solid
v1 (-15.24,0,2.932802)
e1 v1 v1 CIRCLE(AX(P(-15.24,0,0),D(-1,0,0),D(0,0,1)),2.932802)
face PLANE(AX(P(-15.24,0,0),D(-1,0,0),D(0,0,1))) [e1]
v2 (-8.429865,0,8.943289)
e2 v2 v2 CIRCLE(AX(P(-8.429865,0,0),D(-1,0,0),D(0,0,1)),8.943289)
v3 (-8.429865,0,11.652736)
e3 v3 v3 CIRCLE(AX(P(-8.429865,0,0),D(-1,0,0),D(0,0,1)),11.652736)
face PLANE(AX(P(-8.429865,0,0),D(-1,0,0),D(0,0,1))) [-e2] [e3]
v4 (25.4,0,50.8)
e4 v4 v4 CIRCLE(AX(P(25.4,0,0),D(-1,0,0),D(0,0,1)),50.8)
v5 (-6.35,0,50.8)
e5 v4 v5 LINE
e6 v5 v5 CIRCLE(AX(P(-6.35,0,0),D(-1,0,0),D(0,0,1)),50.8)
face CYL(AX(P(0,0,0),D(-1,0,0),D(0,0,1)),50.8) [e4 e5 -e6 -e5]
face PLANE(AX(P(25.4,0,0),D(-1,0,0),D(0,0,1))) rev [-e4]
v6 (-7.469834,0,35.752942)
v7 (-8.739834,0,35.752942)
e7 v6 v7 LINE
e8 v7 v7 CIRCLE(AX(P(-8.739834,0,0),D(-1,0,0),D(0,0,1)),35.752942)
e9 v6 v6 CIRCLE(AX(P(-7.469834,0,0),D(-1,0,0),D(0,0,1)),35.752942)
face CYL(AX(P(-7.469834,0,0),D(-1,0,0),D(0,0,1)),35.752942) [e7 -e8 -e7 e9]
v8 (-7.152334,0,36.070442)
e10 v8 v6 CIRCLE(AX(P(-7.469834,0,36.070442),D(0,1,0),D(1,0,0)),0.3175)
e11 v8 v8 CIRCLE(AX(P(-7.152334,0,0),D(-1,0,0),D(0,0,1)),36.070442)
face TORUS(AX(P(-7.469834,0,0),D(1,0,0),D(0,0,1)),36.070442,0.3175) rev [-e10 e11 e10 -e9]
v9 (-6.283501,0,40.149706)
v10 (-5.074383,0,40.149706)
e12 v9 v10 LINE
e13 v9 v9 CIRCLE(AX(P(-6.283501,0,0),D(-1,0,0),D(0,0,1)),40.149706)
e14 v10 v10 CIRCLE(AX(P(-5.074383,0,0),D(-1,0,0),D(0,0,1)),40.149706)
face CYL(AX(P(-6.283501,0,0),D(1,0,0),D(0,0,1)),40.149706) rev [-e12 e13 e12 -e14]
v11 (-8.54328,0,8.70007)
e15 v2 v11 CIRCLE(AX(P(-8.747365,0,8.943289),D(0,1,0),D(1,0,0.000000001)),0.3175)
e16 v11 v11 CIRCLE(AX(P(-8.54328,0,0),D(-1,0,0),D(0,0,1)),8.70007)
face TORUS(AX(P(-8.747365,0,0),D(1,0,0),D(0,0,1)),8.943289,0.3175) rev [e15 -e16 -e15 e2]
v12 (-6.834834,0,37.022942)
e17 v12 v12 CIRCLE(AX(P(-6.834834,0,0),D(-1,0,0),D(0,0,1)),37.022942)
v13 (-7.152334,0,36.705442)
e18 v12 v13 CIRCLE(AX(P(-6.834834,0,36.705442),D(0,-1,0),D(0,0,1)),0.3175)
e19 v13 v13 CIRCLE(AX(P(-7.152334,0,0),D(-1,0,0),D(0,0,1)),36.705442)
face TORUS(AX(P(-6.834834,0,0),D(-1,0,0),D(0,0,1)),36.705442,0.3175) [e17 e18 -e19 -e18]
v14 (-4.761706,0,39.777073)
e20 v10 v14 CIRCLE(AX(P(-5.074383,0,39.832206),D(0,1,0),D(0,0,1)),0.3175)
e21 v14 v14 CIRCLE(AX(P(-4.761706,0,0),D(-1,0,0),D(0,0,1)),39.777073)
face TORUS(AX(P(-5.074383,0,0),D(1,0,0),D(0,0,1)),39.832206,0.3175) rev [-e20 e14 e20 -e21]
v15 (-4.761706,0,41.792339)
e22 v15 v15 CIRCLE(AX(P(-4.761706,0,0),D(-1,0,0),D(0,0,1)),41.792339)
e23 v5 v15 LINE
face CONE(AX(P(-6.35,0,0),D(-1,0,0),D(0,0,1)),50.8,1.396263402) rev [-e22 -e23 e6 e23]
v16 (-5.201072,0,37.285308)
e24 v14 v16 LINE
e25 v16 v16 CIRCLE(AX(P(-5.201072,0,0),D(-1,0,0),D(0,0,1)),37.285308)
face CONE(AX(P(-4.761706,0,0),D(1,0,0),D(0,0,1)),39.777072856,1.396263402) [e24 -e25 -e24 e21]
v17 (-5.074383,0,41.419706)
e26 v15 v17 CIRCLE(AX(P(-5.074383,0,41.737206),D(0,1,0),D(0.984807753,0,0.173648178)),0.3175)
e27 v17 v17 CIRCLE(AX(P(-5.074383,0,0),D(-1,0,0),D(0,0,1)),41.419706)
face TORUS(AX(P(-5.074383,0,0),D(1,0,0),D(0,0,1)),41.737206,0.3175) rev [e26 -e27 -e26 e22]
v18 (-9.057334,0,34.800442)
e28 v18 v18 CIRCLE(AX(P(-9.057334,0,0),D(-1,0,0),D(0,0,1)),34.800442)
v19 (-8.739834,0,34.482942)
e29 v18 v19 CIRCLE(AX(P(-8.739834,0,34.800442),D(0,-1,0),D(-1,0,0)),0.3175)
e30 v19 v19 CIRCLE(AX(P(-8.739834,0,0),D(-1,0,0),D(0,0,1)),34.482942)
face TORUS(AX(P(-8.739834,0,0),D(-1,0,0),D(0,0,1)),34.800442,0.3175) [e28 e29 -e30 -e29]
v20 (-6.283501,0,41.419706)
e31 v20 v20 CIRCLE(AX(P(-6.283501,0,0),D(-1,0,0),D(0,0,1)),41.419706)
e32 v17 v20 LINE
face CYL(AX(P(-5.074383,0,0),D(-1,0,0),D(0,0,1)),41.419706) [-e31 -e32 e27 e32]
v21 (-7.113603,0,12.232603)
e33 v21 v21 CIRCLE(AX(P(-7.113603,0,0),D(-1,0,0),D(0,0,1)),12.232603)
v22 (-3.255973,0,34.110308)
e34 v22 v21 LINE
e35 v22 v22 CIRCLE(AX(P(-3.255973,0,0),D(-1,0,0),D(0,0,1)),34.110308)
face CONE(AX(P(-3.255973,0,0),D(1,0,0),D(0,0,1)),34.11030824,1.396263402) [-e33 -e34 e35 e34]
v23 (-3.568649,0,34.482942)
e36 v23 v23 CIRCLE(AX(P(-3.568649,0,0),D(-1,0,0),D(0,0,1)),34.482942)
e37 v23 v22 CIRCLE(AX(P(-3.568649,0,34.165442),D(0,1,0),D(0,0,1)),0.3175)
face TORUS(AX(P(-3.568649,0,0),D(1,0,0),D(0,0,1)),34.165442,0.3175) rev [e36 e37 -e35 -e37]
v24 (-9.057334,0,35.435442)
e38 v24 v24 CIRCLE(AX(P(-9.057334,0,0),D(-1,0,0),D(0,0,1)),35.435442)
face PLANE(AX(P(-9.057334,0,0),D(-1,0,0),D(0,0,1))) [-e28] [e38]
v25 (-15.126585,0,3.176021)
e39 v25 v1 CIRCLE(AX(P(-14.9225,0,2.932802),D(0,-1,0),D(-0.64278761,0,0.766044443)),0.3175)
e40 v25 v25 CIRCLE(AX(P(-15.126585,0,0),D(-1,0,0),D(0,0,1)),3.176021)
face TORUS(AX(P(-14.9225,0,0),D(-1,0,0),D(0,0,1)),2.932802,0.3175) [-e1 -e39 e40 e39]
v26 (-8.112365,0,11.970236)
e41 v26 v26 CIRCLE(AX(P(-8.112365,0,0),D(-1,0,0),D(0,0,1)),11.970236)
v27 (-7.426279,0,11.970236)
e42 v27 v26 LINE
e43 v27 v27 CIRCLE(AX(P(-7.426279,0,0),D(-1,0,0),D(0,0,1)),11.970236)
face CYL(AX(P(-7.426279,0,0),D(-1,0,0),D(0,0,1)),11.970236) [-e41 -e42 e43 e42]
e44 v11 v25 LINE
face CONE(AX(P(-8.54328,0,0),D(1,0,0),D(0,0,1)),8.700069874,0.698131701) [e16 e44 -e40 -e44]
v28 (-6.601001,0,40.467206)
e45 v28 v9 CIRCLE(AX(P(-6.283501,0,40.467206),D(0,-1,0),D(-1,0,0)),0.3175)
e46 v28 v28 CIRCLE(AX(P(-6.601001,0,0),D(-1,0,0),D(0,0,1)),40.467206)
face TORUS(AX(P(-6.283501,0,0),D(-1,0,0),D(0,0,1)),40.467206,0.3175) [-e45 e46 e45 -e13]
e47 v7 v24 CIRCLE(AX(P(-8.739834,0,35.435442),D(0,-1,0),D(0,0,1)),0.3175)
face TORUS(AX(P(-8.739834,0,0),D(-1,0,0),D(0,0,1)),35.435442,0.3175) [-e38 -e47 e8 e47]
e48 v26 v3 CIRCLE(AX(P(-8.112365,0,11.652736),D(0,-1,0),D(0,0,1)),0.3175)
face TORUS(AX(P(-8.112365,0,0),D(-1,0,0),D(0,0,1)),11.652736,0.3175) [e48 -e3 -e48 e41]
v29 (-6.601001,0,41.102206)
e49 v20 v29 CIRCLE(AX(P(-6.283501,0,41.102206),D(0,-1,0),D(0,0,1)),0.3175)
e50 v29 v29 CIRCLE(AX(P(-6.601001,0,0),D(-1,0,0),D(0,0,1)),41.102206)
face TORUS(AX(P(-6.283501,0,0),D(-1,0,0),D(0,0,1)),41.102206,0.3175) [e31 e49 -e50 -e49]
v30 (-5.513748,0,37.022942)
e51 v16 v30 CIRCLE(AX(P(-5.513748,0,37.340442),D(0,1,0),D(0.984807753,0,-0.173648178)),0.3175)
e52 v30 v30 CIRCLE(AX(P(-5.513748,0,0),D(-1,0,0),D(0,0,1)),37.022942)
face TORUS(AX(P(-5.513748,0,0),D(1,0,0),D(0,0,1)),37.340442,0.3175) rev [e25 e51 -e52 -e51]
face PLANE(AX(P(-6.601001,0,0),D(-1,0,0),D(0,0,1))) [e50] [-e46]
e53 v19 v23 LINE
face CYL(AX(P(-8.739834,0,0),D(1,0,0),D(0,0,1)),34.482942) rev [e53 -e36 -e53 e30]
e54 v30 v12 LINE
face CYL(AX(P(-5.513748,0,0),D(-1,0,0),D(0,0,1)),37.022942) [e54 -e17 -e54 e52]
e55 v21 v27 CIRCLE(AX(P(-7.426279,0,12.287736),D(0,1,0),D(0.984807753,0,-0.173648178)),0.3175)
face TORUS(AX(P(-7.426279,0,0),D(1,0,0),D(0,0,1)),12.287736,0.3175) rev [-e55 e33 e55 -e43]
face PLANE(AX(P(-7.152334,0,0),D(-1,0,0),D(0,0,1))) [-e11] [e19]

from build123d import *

# Parameters (mm, degrees)
F2_DEPTH = 25.4


# Not quite as in the source:
# - a feature of the source that left no trace in its solid (it failed there, or was rolled back) is left out


with BuildPart() as f1:
    # F0 (on Front) → F1 (revolve)
    with BuildSketch(Plane.XZ):
        with BuildLine():
            Line((-15.24, 0), (0, 0))
            Line((0, 0), (0, 50.8))
            Line((0, 50.8), (-6.35, 50.8))
            Line((-6.35, 50.8), (-4.7617064118, 41.792339449))
            ThreePointArc((-4.7617064118, 41.792339449), (-4.8311637627, 41.5331210865), (-5.0743828734, 41.4197061526))
            Line((-5.0743828734, 41.4197061526), (-6.2835011077, 41.4197061526))
            ThreePointArc((-6.2835011077, 41.4197061526), (-6.5080075107, 41.3267125556), (-6.6010011077, 41.1022061526))
            Line((-6.6010011077, 41.1022061526), (-6.6010011077, 40.4672061526))
            ThreePointArc((-6.6010011077, 40.4672061526), (-6.5080075107, 40.2426997495), (-6.2835011077, 40.1497061526))
            Line((-6.2835011077, 40.1497061526), (-5.0743828734, 40.1497061526))
            ThreePointArc((-5.0743828734, 40.1497061526), (-4.8311637627, 40.0362912186), (-4.7617064118, 39.7770728561))
            Line((-4.7617064118, 39.7770728561), (-5.2010717431, 37.2853082403))
            ThreePointArc((-5.2010717431, 37.2853082403), (-5.3096631386, 37.0972224261), (-5.5137482047, 37.0229415367))
            Line((-5.5137482047, 37.0229415367), (-6.8348340718, 37.0229415367))
            ThreePointArc((-6.8348340718, 37.0229415367), (-7.0593404748, 36.9299479398), (-7.1523340718, 36.7054415367))
            Line((-7.1523340718, 36.7054415367), (-7.1523340718, 36.0704415367))
            ThreePointArc((-7.1523340718, 36.0704415367), (-7.2453276688, 35.8459351337), (-7.4698340718, 35.7529415367))
            Line((-7.4698340718, 35.7529415367), (-8.7398340718, 35.7529415367))
            ThreePointArc((-8.7398340718, 35.7529415367), (-8.9643404748, 35.6599479398), (-9.0573340718, 35.4354415367))
            Line((-9.0573340718, 35.4354415367), (-9.0573340718, 34.8004415367))
            ThreePointArc((-9.0573340718, 34.8004415367), (-8.9643404748, 34.5759351337), (-8.7398340718, 34.4829415367))
            Line((-8.7398340718, 34.4829415367), (-3.5686493249, 34.4829415367))
            ThreePointArc((-3.5686493249, 34.4829415367), (-3.3254302142, 34.3695266028), (-3.2559728633, 34.1103082403))
            Line((-3.2559728633, 34.1103082403), (-7.113602572, 12.2326030065))
            ThreePointArc((-7.113602572, 12.2326030065), (-7.2221939675, 12.0445171922), (-7.4262790336, 11.9702363029))
            Line((-7.4262790336, 11.9702363029), (-8.1123649007, 11.9702363029))
            ThreePointArc((-8.1123649007, 11.9702363029), (-8.3368713037, 11.8772427059), (-8.4298649007, 11.6527363029))
            Line((-8.4298649007, 11.6527363029), (-8.4298649007, 8.9432889844))
            ThreePointArc((-8.4298649007, 8.9432889844), (-8.4596121783, 8.8091076862), (-8.5432798346, 8.7000698737))
            Line((-8.5432798346, 8.7000698737), (-15.1265850661, 3.176020882))
            ThreePointArc((-15.1265850661, 3.176020882), (-15.2102527224, 3.0669830694), (-15.24, 2.9328017713))
            Line((-15.24, 2.9328017713), (-15.24, 0))
        make_face()
    revolve(axis=Axis((-7.62, 0, 0), (-1, 0, 0)))

    # F2 (add): a face of the model
    f2_faces = [f1.faces().sort_by_distance(p)[0] for p in [
        (0, 0, 0),
    ]]
    extrude(f2_faces, amount=F2_DEPTH)


solid = f1.part
